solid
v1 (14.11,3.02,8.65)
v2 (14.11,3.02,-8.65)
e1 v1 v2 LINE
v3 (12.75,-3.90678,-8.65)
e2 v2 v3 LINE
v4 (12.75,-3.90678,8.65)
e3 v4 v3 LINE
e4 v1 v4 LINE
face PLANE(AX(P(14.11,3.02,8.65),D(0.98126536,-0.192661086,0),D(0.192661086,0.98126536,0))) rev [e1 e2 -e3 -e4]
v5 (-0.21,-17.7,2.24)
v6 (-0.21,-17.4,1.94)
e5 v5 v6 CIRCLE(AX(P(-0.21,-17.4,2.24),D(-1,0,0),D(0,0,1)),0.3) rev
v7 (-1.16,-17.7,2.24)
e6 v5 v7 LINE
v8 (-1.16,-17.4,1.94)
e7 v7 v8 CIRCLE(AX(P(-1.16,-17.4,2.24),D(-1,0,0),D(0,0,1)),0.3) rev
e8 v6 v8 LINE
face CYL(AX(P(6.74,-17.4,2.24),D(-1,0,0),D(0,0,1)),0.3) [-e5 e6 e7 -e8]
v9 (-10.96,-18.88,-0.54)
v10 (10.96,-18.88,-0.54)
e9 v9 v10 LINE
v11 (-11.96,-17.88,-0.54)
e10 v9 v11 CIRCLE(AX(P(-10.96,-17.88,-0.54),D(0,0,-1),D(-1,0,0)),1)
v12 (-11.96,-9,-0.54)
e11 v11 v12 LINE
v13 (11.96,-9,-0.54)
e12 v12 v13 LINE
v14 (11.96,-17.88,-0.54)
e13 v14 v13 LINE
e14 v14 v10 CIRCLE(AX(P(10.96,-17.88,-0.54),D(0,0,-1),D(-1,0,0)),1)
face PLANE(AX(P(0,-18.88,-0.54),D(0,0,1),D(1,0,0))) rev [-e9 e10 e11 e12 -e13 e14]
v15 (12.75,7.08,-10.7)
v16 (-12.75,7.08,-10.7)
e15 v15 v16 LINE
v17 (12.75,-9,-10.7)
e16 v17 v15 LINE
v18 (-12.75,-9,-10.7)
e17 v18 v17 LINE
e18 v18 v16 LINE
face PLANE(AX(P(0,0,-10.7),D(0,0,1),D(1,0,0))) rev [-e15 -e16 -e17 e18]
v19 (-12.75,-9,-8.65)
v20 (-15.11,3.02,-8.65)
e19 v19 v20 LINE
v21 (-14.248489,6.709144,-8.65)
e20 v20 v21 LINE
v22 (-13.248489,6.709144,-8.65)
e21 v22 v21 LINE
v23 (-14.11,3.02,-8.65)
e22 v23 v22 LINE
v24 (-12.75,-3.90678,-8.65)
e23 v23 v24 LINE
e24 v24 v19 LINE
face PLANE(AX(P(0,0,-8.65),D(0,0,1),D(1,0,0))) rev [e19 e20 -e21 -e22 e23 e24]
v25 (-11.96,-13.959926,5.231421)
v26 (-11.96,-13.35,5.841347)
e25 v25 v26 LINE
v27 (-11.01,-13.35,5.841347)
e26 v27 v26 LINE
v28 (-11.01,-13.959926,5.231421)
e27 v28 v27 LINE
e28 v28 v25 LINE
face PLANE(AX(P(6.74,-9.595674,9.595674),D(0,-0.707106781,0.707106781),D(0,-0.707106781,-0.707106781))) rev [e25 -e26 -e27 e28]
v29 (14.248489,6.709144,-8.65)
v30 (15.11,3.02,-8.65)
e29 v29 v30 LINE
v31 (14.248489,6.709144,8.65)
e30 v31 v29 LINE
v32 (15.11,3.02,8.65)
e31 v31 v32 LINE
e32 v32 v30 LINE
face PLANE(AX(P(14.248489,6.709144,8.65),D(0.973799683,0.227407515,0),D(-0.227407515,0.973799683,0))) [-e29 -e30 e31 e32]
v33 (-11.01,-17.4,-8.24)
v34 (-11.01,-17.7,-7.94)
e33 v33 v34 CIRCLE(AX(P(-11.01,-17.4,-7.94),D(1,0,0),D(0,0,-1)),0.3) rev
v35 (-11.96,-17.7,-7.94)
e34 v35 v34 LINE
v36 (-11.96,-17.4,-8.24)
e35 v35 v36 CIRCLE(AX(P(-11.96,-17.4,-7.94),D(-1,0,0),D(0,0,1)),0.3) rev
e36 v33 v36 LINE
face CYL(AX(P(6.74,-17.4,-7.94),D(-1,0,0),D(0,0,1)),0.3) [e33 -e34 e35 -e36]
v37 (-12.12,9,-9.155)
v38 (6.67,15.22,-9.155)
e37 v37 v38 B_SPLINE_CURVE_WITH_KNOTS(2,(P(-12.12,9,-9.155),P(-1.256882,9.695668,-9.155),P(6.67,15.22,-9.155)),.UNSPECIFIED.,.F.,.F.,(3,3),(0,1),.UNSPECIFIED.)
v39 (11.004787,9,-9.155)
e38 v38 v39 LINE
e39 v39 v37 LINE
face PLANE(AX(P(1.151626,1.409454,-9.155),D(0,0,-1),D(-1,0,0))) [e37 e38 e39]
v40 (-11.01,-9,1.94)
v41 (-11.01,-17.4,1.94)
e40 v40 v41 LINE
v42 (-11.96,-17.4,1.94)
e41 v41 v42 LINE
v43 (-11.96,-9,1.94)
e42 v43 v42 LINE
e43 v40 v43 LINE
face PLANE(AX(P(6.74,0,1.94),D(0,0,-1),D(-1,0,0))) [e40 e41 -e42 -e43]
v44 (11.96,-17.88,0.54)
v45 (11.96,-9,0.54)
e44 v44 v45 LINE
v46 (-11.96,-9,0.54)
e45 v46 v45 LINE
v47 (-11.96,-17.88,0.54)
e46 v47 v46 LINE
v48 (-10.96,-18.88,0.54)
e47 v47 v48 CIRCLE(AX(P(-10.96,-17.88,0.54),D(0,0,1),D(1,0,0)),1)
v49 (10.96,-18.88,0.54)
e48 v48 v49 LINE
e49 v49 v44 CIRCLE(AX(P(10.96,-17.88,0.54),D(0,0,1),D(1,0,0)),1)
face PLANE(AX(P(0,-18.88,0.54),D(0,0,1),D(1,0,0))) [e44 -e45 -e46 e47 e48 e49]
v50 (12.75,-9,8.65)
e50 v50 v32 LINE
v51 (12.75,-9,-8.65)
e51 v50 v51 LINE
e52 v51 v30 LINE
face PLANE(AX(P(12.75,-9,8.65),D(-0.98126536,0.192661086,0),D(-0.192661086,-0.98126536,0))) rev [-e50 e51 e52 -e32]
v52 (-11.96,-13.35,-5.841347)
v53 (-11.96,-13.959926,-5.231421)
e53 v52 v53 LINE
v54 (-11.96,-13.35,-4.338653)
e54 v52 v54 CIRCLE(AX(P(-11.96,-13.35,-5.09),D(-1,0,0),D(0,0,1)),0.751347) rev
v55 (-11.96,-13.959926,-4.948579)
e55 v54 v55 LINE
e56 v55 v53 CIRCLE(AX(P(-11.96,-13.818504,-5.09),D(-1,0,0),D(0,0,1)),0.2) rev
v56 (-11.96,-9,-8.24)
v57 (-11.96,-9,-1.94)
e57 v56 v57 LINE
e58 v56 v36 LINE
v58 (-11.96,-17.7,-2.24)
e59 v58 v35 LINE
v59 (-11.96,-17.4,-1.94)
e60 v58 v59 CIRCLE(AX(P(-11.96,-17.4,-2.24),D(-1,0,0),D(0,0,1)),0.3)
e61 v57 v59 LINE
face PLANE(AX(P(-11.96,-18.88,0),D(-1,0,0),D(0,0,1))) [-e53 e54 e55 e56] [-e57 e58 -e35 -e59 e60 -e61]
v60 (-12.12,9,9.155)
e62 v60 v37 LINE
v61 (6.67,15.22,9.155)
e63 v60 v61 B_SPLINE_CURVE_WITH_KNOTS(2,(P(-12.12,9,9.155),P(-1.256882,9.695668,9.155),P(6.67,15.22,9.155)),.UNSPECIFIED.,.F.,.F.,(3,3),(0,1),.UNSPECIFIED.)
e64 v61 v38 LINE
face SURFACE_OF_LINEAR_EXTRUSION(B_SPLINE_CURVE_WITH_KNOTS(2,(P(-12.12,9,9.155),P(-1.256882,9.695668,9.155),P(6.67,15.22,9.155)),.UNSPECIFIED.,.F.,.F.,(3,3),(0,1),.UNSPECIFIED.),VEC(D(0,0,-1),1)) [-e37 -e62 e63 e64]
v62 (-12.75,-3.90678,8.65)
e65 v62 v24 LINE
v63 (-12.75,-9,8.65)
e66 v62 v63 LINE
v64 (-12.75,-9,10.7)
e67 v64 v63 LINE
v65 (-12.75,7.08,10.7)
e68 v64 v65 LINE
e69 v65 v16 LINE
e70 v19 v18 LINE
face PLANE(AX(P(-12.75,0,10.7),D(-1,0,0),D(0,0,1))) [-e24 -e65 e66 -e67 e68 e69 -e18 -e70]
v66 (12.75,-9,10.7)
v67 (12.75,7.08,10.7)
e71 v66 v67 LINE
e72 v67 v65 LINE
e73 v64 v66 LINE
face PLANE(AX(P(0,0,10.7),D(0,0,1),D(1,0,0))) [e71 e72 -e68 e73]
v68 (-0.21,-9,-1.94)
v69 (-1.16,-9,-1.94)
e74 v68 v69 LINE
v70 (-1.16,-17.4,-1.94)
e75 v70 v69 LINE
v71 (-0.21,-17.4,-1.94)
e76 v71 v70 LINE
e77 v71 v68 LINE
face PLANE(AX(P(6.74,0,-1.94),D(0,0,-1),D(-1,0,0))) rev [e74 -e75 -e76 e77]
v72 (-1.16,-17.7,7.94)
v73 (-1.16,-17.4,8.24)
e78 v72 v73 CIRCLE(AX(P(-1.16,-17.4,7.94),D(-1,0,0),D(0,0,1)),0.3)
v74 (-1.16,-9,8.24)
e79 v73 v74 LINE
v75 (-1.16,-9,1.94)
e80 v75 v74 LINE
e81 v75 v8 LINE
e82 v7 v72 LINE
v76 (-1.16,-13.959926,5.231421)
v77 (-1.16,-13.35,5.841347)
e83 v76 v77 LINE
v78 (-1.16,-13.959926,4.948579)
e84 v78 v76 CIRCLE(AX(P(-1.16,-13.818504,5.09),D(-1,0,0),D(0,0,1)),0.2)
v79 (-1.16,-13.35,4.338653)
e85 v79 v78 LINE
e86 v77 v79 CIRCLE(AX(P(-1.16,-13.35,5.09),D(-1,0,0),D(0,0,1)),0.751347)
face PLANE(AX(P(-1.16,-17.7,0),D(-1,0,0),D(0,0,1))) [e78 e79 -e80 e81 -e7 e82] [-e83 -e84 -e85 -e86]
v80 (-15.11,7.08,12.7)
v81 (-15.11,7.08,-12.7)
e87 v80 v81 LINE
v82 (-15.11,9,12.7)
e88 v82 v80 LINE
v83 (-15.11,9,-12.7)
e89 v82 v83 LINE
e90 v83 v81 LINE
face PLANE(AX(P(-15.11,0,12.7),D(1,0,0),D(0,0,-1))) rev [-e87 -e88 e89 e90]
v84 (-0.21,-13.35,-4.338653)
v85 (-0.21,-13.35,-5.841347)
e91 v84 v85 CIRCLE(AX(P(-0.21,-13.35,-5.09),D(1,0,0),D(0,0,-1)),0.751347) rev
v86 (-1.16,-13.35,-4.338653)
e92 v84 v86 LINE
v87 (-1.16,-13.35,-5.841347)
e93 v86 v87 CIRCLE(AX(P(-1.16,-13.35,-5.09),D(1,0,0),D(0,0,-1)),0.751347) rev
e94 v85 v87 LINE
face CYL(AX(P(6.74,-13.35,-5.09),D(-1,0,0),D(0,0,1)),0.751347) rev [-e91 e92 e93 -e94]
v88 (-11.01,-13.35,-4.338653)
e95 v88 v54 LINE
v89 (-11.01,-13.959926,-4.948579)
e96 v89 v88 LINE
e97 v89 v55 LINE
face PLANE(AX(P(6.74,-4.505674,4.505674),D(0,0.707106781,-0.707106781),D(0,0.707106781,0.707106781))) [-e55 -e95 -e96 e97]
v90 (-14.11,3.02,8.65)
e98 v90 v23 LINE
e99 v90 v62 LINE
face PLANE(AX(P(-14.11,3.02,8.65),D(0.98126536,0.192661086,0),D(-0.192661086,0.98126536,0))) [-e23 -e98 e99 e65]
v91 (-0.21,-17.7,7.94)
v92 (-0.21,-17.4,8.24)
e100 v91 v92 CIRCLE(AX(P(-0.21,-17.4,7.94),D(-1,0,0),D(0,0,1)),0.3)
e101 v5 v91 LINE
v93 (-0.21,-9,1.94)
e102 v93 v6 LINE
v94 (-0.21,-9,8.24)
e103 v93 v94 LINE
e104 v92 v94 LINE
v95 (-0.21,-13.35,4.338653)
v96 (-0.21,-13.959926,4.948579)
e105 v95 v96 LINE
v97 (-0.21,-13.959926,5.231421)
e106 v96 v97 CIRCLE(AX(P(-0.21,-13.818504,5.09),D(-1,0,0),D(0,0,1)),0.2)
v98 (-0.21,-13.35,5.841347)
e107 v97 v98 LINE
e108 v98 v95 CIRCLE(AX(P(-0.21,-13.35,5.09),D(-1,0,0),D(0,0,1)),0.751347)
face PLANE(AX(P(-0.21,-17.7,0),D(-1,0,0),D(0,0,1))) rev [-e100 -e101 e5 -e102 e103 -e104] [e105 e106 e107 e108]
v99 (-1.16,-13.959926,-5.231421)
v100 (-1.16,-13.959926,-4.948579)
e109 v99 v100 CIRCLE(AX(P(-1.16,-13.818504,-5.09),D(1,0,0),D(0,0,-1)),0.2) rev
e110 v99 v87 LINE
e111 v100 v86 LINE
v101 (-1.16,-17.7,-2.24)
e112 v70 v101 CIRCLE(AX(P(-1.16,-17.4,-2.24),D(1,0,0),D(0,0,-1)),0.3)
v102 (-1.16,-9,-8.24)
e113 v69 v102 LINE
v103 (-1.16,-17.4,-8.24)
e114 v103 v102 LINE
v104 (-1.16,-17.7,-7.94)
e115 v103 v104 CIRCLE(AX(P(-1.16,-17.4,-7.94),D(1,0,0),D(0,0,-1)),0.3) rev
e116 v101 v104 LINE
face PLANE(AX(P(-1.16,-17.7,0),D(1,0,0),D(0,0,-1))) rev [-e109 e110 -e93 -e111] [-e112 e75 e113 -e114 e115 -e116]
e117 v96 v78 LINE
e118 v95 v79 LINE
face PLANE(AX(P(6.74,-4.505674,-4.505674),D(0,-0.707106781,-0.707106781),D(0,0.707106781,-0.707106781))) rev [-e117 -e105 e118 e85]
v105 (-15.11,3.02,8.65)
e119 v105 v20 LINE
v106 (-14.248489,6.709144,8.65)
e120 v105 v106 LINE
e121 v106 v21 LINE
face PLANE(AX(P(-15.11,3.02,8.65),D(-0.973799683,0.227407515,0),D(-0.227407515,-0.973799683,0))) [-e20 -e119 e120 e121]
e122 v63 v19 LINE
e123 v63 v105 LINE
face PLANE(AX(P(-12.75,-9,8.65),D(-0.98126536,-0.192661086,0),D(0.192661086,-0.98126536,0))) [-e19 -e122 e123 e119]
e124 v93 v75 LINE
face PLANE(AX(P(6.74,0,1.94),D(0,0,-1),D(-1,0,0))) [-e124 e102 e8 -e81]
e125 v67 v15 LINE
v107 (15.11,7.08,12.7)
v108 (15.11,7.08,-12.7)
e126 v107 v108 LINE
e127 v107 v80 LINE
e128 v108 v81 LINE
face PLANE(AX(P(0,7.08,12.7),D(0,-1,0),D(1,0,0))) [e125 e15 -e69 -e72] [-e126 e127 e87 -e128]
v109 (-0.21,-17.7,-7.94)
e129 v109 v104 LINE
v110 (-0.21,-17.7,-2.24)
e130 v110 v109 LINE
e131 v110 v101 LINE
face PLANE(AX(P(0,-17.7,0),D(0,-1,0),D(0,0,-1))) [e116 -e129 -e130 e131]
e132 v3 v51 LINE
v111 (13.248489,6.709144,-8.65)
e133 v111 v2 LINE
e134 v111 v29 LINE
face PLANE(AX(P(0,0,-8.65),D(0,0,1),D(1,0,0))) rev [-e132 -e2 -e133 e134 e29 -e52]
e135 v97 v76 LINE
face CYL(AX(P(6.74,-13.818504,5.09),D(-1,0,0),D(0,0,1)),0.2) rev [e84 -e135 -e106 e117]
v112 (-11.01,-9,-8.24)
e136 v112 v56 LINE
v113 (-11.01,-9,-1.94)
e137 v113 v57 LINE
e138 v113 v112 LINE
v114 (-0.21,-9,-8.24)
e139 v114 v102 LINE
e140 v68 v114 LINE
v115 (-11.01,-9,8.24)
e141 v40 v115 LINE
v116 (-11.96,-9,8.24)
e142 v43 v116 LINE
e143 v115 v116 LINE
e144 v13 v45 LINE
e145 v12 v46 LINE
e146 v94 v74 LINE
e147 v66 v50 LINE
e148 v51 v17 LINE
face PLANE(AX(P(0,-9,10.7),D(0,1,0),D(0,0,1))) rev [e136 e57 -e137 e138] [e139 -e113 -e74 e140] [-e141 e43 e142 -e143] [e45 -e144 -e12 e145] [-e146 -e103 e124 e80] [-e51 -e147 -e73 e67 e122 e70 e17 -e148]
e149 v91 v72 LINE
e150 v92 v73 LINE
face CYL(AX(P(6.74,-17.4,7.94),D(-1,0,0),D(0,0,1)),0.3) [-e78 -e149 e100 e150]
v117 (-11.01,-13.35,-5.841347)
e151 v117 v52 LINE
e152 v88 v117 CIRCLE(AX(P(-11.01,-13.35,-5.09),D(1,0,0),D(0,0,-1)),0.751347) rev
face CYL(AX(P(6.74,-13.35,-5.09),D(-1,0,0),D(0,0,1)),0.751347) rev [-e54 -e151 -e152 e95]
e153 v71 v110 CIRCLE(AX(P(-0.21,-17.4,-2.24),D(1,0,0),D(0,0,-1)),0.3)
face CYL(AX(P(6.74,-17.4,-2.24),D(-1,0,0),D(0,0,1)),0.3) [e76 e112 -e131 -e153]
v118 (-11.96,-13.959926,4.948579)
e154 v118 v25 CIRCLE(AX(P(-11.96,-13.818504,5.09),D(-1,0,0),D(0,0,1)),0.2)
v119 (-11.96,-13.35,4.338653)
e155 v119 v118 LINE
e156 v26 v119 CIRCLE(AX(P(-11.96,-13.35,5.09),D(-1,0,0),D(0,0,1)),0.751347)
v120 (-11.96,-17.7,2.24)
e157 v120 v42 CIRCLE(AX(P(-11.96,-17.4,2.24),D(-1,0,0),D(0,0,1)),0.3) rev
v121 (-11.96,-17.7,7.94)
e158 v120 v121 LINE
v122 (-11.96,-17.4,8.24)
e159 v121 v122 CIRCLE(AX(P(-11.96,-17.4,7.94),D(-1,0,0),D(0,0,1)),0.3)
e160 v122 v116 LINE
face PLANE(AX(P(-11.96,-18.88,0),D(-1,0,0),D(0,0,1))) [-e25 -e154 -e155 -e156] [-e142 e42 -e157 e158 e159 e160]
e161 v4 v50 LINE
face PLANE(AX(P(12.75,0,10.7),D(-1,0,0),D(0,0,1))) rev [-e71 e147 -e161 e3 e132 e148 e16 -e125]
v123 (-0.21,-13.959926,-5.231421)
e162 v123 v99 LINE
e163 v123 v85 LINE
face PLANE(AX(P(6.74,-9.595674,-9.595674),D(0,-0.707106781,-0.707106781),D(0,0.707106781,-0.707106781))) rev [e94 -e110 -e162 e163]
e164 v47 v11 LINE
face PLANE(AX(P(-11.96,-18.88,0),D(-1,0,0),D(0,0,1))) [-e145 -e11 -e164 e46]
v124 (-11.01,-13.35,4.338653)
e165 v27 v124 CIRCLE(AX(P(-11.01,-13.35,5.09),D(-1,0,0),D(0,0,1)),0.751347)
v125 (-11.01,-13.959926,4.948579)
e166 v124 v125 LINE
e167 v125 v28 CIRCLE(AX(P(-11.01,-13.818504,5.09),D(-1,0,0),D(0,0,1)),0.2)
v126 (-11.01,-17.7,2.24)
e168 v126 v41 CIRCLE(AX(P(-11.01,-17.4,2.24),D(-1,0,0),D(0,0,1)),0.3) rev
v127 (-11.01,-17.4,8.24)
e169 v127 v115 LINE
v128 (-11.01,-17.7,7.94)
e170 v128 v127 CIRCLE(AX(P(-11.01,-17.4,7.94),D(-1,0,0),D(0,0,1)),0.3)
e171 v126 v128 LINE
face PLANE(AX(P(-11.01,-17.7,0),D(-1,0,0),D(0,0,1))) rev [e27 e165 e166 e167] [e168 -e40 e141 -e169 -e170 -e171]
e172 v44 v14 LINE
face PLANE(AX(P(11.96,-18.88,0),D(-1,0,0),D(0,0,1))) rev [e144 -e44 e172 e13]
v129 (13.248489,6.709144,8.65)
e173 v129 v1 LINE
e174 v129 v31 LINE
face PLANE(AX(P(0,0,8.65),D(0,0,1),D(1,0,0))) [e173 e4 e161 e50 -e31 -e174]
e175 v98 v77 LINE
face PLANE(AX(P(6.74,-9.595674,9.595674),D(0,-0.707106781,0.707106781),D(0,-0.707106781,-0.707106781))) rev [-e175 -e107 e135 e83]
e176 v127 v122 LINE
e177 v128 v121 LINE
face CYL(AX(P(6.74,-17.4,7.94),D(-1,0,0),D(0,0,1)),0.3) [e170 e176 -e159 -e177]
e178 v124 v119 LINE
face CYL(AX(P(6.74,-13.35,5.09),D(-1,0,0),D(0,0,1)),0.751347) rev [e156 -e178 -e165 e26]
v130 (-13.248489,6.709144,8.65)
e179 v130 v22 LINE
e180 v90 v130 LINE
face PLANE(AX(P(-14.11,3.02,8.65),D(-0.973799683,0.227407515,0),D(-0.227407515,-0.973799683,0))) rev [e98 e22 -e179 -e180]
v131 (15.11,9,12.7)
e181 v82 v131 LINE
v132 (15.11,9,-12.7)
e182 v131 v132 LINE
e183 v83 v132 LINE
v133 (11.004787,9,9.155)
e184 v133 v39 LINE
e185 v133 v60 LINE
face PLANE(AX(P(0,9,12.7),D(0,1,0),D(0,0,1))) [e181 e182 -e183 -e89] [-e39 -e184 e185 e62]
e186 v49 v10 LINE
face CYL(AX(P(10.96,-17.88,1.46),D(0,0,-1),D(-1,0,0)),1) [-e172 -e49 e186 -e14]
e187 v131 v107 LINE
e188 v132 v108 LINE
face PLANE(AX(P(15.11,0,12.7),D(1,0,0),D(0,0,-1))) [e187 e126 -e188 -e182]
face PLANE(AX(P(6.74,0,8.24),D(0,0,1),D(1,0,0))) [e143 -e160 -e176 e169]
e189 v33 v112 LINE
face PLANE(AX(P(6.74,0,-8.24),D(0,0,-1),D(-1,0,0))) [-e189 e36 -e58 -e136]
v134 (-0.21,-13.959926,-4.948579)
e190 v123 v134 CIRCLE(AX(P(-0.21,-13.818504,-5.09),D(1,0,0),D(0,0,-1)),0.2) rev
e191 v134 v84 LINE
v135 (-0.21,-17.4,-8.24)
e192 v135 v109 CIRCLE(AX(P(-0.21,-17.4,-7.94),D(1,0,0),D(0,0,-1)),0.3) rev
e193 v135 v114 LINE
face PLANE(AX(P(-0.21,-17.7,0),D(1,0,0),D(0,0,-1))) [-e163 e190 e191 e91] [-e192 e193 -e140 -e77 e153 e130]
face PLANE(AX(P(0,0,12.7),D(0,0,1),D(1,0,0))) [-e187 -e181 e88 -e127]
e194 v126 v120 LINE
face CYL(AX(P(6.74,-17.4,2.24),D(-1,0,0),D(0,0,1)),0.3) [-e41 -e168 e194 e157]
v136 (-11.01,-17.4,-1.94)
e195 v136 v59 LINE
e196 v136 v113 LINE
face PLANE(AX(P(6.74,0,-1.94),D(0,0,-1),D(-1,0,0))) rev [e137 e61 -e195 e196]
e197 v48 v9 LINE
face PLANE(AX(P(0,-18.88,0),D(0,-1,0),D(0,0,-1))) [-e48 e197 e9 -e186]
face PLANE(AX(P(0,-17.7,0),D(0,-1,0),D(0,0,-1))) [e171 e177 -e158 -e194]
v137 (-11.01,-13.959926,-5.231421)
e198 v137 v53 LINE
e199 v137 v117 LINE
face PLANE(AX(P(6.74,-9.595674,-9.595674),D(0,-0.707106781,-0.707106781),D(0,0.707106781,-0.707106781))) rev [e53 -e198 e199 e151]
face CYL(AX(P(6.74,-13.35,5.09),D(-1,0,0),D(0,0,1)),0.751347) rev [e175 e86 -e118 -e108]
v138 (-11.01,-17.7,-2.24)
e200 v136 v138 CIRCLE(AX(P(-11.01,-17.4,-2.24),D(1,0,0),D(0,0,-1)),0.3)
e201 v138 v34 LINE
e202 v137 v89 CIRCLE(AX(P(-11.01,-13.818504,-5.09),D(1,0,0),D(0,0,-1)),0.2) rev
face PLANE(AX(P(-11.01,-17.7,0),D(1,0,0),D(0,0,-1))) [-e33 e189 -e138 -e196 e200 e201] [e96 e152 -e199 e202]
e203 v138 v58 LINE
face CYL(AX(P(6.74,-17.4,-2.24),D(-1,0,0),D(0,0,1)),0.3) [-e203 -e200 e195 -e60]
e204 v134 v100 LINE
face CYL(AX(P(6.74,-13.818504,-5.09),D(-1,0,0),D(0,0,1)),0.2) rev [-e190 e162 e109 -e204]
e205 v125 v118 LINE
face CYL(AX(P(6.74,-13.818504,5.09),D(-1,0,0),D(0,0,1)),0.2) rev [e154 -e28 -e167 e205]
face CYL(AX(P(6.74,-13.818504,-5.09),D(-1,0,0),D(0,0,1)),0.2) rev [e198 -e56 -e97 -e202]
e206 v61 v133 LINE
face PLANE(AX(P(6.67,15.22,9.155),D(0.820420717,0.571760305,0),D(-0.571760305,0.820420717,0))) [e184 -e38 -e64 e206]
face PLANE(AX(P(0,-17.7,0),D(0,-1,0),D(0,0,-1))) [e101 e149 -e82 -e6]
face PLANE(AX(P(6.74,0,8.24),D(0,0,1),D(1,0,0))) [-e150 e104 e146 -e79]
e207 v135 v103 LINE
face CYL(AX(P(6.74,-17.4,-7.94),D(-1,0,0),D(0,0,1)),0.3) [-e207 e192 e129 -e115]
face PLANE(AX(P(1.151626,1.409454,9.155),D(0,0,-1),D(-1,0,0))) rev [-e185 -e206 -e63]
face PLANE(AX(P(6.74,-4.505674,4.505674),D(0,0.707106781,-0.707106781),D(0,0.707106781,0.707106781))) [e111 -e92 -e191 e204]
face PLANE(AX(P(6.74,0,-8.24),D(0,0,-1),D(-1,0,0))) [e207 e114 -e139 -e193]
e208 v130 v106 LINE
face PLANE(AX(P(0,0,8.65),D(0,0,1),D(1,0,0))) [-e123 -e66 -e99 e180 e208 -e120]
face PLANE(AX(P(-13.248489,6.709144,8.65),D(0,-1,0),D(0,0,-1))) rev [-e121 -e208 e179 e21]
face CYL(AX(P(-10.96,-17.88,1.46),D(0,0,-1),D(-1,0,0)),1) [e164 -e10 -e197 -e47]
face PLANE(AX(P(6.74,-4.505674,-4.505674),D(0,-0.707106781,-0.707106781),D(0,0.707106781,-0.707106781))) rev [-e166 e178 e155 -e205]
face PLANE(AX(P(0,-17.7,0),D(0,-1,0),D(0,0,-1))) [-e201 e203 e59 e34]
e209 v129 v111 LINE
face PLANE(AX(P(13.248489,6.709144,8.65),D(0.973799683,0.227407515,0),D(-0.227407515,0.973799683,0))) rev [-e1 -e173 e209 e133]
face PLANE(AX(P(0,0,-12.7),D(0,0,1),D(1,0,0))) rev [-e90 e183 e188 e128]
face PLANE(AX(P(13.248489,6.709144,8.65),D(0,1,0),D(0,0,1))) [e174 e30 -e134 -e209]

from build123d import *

# Parameters (mm, degrees)
BOSS_EXTRUDE1_DEPTH = 10.7
SKETCH2_3_W         = 2.36
SKETCH2_3_H         = 1.92
BOSS_EXTRUDE2_DEPTH = 12.7
EXTRUDE_THIN1_START = -9.155
EXTRUDE_THIN1_DEPTH = 18.31
SKETCH5_W           = 23.92
SKETCH5_H           = 0.54
BOSS_EXTRUDE3_DEPTH = 9.88
CUT_EXTRUDE1_DEPTH  = 2
BOSS_EXTRUDE4_DEPTH = 8.7
CUT_EXTRUDE3_DEPTH  = 18.7
BOSS_EXTRUDE5_DEPTH = 8.65
BOSS_EXTRUDE7_DEPTH = 8.65


# Read off the part's stored shape, not the designer's step: Extrude-Thin1
with BuildPart() as part:
    # Sketch2 → Boss-Extrude1 (new, symmetric)
    with BuildSketch(Plane.XY):
        Polygon((12.75, -3.906779661), (12.75, 7.08), (5.116131156, 7.08), (-12.75, 7.08), (-12.75, -3.906779661), (-12.75, -9), (0, -9), (12.75, -9), align=None)
    extrude(amount=BOSS_EXTRUDE1_DEPTH, both=True)

    # Sketch2<3> → Boss-Extrude2 (add, symmetric)
    with BuildSketch(Plane.XY):
        Polygon((-12.75, 7.08), (5.116131156, 7.08), (5.116131156, 9), (0, 9), (-12.12, 9), (-12.75, 9), align=None)
        with Locations((-13.93, 8.04)):
            Rectangle(SKETCH2_3_W, SKETCH2_3_H)
        with Locations((13.93, 8.04)):
            Rectangle(SKETCH2_3_W, SKETCH2_3_H)
        Polygon((5.116131156, 7.08), (12.75, 7.08), (12.75, 9), (12.12, 9), (6.67, 9), (5.116131156, 9), align=None)
    extrude(amount=BOSS_EXTRUDE2_DEPTH, both=True)

    # Extrude-Thin1 outline → Extrude-Thin1 (add)
    with BuildSketch(Plane.XY.offset(EXTRUDE_THIN1_START)):
        with BuildLine():
            add(Edge.make_bspline(
                [(-12.12, 9), (-1.256881612, 9.695668212), (6.67, 15.22)],
                knots=[0, 0, 0, 1, 1, 1], degree=2))
            Line((-12.12, 9), (11.004787045, 9))
            Line((11.004787045, 9), (6.67, 15.22))
        make_face()
    extrude(amount=EXTRUDE_THIN1_DEPTH)

    # Sketch5 → Boss-Extrude3 (add)
    with BuildSketch(Plane.XZ.offset(9)):
        with Locations((0, -0.27)):
            Rectangle(SKETCH5_W, SKETCH5_H)
        with Locations((0, 0.27)):
            Rectangle(SKETCH5_W, SKETCH5_H)
    extrude(amount=BOSS_EXTRUDE3_DEPTH)

    # Sketch6 → Cut-Extrude1 (cut)
    with BuildSketch(Plane(origin=(0, 0, -0.54), x_dir=(-1, 0, 0), z_dir=(0, 0, -1))):
        with BuildLine():
            ThreePointArc((-10.96, -18.88), (-11.667106781, -18.587106781), (-11.96, -17.88))
            Line((-11.96, -17.88), (-11.96, -18.88))
            Line((-11.96, -18.88), (-10.96, -18.88))
        make_face()
        with BuildLine():
            Line((11.96, -18.88), (11.96, -17.88))
            ThreePointArc((11.96, -17.88), (11.667106781, -18.587106781), (10.96, -18.88))
            Line((10.96, -18.88), (11.96, -18.88))
        make_face()
    extrude(amount=-CUT_EXTRUDE1_DEPTH, mode=Mode.SUBTRACT)

    # Sketch7 → Boss-Extrude4 (add)
    with BuildSketch(Plane.XZ.offset(9)):
        Polygon((-11.96, 9.64), (-11.96, 0.54), (-11.01, 0.54), (-11.01, 3.822076599), (-11.01, 9.64), align=None)
        Polygon((-1.16, 3.822076599), (-1.16, 0.54), (-0.21, 0.54), (-0.21, 9.64), (-1.16, 9.64), align=None)
        Polygon((-0.21, -0.54), (-1.16, -0.54), (-1.16, -5.923650712), (-1.16, -9.64), (-0.21, -9.64), align=None)
        Polygon((-11.01, -0.54), (-11.96, -0.54), (-11.96, -9.64), (-11.01, -9.64), (-11.01, -5.923650712), align=None)
    extrude(amount=BOSS_EXTRUDE4_DEPTH)

    # Sketch8 → Cut-Extrude3 (cut)
    with BuildSketch(Plane.ZY.offset(11.96)):
        with BuildLine():
            Line((-8.24, -9), (-9.64, -9))
            Line((-9.64, -9), (-9.64, -17.7))
            Line((-9.64, -17.7), (-7.94, -17.7))
            ThreePointArc((-7.94, -17.7), (-8.152132034, -17.612132034), (-8.24, -17.4))
            Line((-8.24, -17.4), (-8.24, -9))
        make_face()
        with BuildLine():
            Line((-0.54, -9), (-1.94, -9))
            Line((-1.94, -9), (-1.94, -17.4))
            ThreePointArc((-1.94, -17.4), (-2.027867966, -17.612132034), (-2.24, -17.7))
            Line((-2.24, -17.7), (-0.54, -17.7))
            Line((-0.54, -17.7), (-0.54, -9))
        make_face()
        with BuildLine():
            ThreePointArc((-4.33865298, -13.35), (-5.09, -12.59865298), (-5.84134702, -13.35))
            Line((-5.84134702, -13.35), (-5.231421356, -13.959925664))
            ThreePointArc((-5.231421356, -13.959925664), (-5.09, -14.018504308), (-4.948578644, -13.959925664))
            Line((-4.948578644, -13.959925664), (-4.33865298, -13.35))
        make_face()
        with BuildLine():
            Line((1.94, -9), (0.54, -9))
            Line((0.54, -9), (0.54, -17.7))
            Line((0.54, -17.7), (2.24, -17.7))
            ThreePointArc((2.24, -17.7), (2.027867966, -17.612132034), (1.94, -17.4))
            Line((1.94, -17.4), (1.94, -9))
        make_face()
        with BuildLine():
            Line((9.64, -9), (8.24, -9))
            Line((8.24, -9), (8.24, -17.4))
            ThreePointArc((8.24, -17.4), (8.152132034, -17.612132034), (7.94, -17.7))
            Line((7.94, -17.7), (9.64, -17.7))
            Line((9.64, -17.7), (9.64, -9))
        make_face()
        with BuildLine():
            ThreePointArc((5.84134702, -13.35), (5.09, -12.59865298), (4.33865298, -13.35))
            Line((4.33865298, -13.35), (4.948578644, -13.959925664))
            ThreePointArc((4.948578644, -13.959925664), (5.09, -14.018504308), (5.231421356, -13.959925664))
            Line((5.231421356, -13.959925664), (5.84134702, -13.35))
        make_face()
    extrude(amount=-CUT_EXTRUDE3_DEPTH, mode=Mode.SUBTRACT)

    # Sketch2<13> → Boss-Extrude5 (add, symmetric)
    with BuildSketch(Plane.XY):
        Polygon((14.248489171, 6.709143574), (15.11, 3.02), (12.75, -9), (12.75, -3.906779661), (14.11, 3.02), (13.248489171, 6.709143574), align=None)
    extrude(amount=BOSS_EXTRUDE5_DEPTH, both=True)

    # Sketch2<16> → Boss-Extrude7 (add, symmetric)
    with BuildSketch(Plane.XY):
        Polygon((-12.75, -3.906779661), (-12.75, -9), (-15.11, 3.02), (-14.248489171, 6.709143574), (-13.248489171, 6.709143574), (-14.11, 3.02), align=None)
    extrude(amount=BOSS_EXTRUDE7_DEPTH, both=True)


solid = part.part
